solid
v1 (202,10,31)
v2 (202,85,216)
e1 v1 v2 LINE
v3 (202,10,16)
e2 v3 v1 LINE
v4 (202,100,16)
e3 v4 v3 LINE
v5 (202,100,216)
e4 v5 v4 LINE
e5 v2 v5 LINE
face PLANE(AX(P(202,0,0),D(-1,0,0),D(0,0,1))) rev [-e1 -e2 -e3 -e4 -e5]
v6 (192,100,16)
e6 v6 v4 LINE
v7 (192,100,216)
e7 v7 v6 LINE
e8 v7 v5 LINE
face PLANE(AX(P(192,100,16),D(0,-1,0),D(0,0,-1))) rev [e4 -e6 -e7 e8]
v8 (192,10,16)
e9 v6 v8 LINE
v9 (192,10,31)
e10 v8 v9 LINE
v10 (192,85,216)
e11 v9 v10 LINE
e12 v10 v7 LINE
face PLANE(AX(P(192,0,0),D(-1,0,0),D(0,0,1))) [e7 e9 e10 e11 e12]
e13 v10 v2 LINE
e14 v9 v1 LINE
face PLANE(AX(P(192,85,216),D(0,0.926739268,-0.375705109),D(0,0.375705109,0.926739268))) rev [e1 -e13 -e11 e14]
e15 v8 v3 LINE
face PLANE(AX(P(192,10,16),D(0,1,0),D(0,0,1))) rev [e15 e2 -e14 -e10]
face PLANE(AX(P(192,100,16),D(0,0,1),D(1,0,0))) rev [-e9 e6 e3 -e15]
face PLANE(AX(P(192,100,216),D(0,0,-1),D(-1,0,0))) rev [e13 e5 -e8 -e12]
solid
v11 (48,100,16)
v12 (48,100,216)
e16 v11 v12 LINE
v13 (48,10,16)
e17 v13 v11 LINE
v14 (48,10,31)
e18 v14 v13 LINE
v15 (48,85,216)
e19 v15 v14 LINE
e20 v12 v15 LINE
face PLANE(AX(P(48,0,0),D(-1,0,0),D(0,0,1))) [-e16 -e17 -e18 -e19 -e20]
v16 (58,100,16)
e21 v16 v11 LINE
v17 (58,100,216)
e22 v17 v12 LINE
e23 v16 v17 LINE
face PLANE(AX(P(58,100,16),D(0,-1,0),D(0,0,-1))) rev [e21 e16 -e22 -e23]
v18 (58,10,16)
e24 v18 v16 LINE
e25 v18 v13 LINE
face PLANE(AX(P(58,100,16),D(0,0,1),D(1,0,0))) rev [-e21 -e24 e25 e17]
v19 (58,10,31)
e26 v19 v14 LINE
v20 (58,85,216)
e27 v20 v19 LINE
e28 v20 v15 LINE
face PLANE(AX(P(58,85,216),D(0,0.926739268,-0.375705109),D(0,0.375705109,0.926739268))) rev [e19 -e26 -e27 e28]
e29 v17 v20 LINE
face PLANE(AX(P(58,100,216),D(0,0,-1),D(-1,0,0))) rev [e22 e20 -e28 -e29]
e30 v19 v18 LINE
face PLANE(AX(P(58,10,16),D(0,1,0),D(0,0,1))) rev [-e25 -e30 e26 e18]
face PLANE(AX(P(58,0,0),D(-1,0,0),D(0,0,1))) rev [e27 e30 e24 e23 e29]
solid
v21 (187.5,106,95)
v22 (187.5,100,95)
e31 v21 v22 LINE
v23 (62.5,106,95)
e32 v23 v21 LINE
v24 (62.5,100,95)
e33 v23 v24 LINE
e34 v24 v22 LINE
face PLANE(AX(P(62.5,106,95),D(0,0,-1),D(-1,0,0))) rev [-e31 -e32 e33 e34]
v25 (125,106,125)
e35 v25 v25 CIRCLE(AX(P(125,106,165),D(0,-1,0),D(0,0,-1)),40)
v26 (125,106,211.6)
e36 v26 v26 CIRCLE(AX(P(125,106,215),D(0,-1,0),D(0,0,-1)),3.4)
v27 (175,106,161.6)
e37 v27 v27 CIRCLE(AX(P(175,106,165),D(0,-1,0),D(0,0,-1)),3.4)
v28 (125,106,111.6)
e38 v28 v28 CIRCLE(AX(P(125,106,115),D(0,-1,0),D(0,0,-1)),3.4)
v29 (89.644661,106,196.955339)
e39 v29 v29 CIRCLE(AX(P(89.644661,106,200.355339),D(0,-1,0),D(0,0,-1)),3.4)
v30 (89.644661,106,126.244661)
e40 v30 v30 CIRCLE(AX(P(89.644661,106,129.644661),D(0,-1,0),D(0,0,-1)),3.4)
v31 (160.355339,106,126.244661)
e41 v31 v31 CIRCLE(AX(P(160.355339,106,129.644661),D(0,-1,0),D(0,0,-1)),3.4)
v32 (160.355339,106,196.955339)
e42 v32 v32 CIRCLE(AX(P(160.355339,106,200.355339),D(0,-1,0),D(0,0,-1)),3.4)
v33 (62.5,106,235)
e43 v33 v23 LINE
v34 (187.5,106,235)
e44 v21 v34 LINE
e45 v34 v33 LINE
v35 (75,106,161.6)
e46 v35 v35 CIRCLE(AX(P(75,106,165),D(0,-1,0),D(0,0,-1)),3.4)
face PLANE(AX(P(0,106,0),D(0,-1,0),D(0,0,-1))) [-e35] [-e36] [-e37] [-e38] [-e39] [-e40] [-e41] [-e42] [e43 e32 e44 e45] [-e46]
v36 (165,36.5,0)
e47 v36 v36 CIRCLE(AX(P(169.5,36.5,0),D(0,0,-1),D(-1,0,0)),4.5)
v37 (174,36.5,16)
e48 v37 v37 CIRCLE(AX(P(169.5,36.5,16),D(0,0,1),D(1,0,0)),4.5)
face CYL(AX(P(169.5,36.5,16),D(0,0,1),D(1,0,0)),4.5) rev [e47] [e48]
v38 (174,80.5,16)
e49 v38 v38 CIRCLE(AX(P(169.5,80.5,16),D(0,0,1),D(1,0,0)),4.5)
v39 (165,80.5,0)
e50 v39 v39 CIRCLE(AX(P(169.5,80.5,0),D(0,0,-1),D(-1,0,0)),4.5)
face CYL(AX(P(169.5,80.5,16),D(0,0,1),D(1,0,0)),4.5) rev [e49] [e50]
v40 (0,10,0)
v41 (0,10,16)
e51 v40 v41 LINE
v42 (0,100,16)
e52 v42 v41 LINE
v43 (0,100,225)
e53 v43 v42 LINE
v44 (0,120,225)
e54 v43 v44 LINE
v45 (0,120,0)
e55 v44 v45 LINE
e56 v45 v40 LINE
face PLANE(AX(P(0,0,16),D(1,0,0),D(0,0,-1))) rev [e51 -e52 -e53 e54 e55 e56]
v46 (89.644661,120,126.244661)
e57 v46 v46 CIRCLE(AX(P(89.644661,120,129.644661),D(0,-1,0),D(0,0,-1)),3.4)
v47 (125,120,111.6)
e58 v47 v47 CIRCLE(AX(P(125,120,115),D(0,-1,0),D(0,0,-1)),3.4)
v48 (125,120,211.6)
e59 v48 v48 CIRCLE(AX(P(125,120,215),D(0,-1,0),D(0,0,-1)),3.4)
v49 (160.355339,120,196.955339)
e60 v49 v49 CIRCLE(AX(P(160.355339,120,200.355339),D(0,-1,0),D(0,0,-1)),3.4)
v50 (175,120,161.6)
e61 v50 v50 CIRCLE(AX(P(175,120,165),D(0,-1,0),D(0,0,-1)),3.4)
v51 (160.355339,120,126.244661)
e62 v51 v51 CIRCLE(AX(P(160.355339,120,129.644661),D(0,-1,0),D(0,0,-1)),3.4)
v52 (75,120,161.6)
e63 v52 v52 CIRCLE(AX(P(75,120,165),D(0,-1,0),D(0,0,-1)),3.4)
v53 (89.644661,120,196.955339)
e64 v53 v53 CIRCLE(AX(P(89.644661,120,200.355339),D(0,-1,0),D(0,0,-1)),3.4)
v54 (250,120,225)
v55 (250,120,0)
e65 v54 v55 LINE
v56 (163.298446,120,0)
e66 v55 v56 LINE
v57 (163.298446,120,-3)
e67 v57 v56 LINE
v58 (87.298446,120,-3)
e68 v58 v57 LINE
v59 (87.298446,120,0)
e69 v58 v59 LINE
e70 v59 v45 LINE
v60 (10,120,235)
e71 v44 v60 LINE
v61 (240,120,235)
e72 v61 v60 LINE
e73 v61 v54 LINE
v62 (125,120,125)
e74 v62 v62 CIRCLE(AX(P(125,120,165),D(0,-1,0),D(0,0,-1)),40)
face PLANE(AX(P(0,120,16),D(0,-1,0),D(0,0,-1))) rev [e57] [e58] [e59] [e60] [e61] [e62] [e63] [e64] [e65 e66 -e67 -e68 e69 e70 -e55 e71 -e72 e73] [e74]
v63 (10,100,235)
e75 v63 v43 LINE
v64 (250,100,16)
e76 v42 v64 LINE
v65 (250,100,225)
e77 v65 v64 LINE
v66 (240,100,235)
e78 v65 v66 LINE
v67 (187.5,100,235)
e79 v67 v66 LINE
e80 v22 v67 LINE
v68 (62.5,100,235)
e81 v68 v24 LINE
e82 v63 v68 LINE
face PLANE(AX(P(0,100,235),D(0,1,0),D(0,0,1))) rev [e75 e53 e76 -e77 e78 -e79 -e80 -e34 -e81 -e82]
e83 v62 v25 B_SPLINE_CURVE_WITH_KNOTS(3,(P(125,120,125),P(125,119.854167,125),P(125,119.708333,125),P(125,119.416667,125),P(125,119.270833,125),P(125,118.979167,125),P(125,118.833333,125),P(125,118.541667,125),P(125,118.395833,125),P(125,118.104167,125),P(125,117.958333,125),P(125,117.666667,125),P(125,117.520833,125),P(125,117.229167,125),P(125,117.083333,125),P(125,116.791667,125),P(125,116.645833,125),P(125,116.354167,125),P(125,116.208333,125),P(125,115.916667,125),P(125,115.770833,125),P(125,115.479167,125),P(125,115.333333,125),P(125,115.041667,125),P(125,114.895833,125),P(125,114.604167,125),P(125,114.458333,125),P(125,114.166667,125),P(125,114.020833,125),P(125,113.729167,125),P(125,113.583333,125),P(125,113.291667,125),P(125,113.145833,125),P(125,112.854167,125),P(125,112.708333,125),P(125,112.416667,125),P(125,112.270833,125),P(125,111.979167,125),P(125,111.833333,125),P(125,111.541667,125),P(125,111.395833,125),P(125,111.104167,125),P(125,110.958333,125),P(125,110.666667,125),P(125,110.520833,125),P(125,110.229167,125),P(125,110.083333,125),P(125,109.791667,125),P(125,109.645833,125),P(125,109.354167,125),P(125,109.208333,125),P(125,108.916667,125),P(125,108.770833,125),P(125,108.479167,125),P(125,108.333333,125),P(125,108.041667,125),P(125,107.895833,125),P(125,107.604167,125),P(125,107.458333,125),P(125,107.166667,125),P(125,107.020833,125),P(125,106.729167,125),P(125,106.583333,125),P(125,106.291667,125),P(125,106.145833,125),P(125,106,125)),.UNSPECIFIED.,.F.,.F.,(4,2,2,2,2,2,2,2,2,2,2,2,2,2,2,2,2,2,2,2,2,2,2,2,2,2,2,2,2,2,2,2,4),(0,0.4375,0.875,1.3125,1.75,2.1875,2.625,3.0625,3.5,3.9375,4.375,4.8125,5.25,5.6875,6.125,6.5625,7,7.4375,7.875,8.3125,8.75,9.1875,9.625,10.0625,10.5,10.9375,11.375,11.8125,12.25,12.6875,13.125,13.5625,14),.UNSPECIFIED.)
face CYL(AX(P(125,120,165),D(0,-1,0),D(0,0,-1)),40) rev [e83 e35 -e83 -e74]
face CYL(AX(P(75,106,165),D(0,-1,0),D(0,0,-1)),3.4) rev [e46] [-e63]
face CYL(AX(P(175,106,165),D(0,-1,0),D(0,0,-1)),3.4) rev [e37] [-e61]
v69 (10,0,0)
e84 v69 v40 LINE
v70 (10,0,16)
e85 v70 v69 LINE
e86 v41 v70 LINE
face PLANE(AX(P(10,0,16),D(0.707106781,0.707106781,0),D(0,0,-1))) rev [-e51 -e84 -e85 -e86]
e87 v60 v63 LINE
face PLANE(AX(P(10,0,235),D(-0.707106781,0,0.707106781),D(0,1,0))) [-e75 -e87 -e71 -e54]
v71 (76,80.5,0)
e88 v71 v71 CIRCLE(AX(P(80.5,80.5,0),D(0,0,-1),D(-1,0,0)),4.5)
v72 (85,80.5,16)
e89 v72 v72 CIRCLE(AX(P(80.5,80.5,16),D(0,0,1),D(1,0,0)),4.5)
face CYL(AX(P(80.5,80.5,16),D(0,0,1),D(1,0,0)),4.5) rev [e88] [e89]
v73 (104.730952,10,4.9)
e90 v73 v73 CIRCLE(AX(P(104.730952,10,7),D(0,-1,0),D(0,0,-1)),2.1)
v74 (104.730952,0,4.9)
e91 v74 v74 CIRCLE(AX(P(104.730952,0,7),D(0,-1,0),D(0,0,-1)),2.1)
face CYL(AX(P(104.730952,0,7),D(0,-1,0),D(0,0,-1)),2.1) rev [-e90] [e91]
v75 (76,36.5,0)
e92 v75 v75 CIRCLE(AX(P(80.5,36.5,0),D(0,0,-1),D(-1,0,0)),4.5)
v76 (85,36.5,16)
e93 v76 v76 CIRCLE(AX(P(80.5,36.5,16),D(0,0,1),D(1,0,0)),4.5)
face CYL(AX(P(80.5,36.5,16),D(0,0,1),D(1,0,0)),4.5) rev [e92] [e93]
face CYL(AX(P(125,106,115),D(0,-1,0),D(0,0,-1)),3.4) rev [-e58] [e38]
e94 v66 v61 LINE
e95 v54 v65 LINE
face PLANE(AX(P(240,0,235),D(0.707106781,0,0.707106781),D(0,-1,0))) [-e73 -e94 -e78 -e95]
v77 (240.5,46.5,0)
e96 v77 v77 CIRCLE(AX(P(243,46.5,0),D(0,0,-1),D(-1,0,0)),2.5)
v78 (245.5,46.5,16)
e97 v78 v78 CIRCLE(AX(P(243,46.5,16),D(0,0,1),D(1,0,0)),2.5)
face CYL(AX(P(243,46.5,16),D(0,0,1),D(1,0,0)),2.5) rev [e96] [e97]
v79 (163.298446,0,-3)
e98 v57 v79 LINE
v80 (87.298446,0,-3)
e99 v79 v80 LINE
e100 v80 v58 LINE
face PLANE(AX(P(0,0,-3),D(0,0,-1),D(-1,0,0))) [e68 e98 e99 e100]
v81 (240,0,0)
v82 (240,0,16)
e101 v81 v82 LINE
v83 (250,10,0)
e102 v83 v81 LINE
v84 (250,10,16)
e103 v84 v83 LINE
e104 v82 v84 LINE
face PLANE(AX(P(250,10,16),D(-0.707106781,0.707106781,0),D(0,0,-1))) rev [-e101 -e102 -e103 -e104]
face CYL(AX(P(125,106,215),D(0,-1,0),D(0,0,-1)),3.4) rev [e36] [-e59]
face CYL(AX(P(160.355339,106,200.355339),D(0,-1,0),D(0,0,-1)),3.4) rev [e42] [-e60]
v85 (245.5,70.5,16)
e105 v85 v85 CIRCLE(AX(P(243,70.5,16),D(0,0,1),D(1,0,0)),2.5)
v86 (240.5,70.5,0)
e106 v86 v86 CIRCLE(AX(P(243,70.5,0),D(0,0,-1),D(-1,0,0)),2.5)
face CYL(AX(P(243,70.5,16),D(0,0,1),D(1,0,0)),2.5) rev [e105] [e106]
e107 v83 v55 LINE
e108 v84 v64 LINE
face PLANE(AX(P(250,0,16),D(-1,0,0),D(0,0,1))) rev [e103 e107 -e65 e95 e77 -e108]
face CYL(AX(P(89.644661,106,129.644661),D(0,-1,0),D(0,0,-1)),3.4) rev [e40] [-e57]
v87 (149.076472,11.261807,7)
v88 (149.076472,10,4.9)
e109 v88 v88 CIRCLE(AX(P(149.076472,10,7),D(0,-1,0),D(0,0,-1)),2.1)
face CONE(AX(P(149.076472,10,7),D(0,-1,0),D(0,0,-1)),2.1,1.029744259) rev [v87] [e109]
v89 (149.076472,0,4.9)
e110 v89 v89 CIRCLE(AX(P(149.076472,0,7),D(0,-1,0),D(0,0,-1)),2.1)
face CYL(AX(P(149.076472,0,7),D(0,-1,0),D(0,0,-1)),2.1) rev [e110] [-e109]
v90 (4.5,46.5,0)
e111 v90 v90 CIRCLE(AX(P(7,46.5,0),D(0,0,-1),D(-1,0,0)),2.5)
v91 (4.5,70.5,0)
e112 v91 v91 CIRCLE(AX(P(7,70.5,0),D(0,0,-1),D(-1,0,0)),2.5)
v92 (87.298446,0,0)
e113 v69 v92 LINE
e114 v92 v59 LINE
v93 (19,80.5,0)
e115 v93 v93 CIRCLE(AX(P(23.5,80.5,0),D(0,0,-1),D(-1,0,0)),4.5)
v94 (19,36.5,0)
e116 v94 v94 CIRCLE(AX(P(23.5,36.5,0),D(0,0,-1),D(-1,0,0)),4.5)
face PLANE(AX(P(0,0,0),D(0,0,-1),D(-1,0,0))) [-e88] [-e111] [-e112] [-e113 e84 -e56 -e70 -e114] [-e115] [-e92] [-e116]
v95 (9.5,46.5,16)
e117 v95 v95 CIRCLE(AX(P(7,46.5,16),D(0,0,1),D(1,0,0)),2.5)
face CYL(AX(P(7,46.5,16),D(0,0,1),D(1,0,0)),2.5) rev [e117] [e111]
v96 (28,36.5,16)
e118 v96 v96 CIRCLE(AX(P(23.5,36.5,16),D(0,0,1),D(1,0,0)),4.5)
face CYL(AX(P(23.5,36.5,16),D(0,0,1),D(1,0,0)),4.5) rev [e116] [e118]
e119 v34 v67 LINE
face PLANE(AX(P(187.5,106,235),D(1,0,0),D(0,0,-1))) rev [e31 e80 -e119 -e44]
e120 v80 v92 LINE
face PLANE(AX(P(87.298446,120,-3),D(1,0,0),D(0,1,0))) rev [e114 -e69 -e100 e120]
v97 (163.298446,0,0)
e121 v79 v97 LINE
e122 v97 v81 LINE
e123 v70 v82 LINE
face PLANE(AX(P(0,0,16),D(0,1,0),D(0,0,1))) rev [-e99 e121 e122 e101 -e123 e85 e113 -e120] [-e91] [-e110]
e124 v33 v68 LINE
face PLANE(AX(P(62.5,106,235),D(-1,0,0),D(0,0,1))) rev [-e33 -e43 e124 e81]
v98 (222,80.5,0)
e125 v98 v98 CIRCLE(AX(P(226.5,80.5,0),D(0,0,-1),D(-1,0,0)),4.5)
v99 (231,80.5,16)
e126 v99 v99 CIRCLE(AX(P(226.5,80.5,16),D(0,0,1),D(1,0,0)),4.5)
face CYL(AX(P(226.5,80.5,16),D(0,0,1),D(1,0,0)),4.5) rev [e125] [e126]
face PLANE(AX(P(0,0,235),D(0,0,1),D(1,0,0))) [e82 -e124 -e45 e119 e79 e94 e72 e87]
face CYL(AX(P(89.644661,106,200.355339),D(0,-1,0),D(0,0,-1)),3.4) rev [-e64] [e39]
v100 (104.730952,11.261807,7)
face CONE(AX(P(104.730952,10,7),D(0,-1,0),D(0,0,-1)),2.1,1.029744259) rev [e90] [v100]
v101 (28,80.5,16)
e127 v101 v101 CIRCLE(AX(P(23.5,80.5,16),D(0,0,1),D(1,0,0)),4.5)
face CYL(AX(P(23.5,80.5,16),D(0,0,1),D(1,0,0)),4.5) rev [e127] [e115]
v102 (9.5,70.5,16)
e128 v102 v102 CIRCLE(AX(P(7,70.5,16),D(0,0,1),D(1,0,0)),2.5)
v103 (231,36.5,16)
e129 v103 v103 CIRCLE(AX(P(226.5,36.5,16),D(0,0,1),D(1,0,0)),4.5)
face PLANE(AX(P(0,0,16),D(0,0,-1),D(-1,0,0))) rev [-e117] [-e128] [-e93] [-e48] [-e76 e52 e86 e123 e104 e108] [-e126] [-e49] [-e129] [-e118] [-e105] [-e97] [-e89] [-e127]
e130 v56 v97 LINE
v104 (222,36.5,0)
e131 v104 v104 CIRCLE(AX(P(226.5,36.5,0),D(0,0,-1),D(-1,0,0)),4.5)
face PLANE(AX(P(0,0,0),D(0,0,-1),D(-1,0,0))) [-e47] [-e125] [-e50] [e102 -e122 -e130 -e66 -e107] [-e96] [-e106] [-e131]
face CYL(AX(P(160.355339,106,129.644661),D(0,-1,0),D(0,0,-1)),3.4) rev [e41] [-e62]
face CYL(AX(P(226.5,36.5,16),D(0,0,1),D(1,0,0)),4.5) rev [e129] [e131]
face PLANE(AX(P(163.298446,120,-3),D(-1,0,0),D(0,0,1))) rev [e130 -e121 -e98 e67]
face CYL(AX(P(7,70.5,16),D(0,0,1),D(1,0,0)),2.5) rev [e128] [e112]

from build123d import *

# Parameters (mm, degrees)
SKETCH1_W                         = 250
SKETCH1_H                         = 120
BOSS_EXTRUDE1_DEPTH               = 16
SKETCH2_W                         = 250
SKETCH2_H                         = 20
BOSS_EXTRUDE2_DEPTH               = 235
GUSSET1_START                     = 192
GUSSET1_DEPTH                     = 10
GUSSET2_START                     = 48
GUSSET2_DEPTH                     = 10
SKETCH5_W                         = 76
SKETCH5_H                         = 120
BOSS_EXTRUDE3_DEPTH               = 3
SKETCH6_W                         = 125
SKETCH6_H                         = 140
CUT_EXTRUDE1_DEPTH                = 6
SKETCH7_R                         = 40
CUT_EXTRUDE2_DEPTH                = 360.111403328
SKETCH10_W                        = 3.4
SKETCH10_H                        = 14
M8_TAPPED_HOLE1_AT_2_COUNT        = 2
M8_TAPPED_HOLE1_AT_2_PITCH        = 70.710678119
M8_TAPPED_HOLE1_AT_3_COUNT        = 2
M8_TAPPED_HOLE1_AT_3_PITCH        = 100
M8_TAPPED_HOLE1_AT_4_COUNT        = 2
M8_TAPPED_HOLE1_AT_4_PITCH        = 70.710678119
M8_TAPPED_HOLE1_AT_5_COUNT        = 2
M8_TAPPED_HOLE1_AT_5_PITCH        = 92.387953251
M8_TAPPED_HOLE1_AT_6_COUNT        = 2
M8_TAPPED_HOLE1_AT_6_PITCH        = 38.268343237
M8_TAPPED_HOLE1_AT_7_COUNT        = 2
M8_TAPPED_HOLE1_AT_7_PITCH        = 92.387953251
M8_TAPPED_HOLE1_AT_8_COUNT        = 2
M8_TAPPED_HOLE1_AT_8_PITCH        = 38.268343237
M5_TAPPED_HOLE1_AT_2_COUNT        = 2
M5_TAPPED_HOLE1_AT_2_PITCH        = 44.345519866
SKETCH16_W                        = 4.5
SKETCH16_H                        = 19
F_9_0_9_DIAMETER_HOLE1_AT_2_COUNT = 2
F_9_0_9_DIAMETER_HOLE1_AT_2_PITCH = 44
F_9_0_9_DIAMETER_HOLE1_AT_3_COUNT = 2
F_9_0_9_DIAMETER_HOLE1_AT_3_PITCH = 57
F_9_0_9_DIAMETER_HOLE1_AT_4_COUNT = 2
F_9_0_9_DIAMETER_HOLE1_AT_4_PITCH = 72.00694411
F_9_0_9_DIAMETER_HOLE1_AT_5_COUNT = 2
F_9_0_9_DIAMETER_HOLE1_AT_5_PITCH = 146
F_9_0_9_DIAMETER_HOLE1_AT_6_COUNT = 2
F_9_0_9_DIAMETER_HOLE1_AT_6_PITCH = 152.486064937
F_9_0_9_DIAMETER_HOLE1_AT_7_COUNT = 2
F_9_0_9_DIAMETER_HOLE1_AT_7_PITCH = 203
F_9_0_9_DIAMETER_HOLE1_AT_8_COUNT = 2
F_9_0_9_DIAMETER_HOLE1_AT_8_PITCH = 207.713745332
SKETCH18_W                        = 2.5
SKETCH18_H                        = 19
TAP_DRILL_FOR_M6_TAP1_AT_2_COUNT  = 2
TAP_DRILL_FOR_M6_TAP1_AT_2_PITCH  = 24
TAP_DRILL_FOR_M6_TAP1_AT_3_COUNT  = 2
TAP_DRILL_FOR_M6_TAP1_AT_3_PITCH  = 236
TAP_DRILL_FOR_M6_TAP1_AT_4_COUNT  = 2
TAP_DRILL_FOR_M6_TAP1_AT_4_PITCH  = 237.217200051
CHAMFER1_SIZE                     = 10


# Read off the part's stored shape, not the designer's step: Gusset1, Gusset2
with BuildPart() as part:
    # Sketch1 → Boss-Extrude1 (new body)
    with BuildSketch(Plane.XY):
        with Locations((125, 60)):
            Rectangle(SKETCH1_W, SKETCH1_H)
    extrude(amount=BOSS_EXTRUDE1_DEPTH)

    # Sketch2 → Boss-Extrude2 (add)
    with BuildSketch(Plane.XY):
        with Locations((125, 110)):
            Rectangle(SKETCH2_W, SKETCH2_H)
    extrude(amount=BOSS_EXTRUDE2_DEPTH)

    # Sketch5 → Boss-Extrude3 (add)
    with BuildSketch(Plane(origin=(0, 0, 0), x_dir=(-1, 0, 0), z_dir=(0, 0, -1))):
        with Locations((-125.298445595, 60)):
            Rectangle(SKETCH5_W, SKETCH5_H)
    extrude(amount=BOSS_EXTRUDE3_DEPTH)

    # Sketch6 → Cut-Extrude1 (cut)
    with BuildSketch(Plane.XZ.offset(-100)):
        with Locations((125, 165)):
            Rectangle(SKETCH6_W, SKETCH6_H)
    extrude(amount=-CUT_EXTRUDE1_DEPTH, mode=Mode.SUBTRACT)

    # Sketch7 → Cut-Extrude2 (cut, through all)
    with BuildSketch(Plane.XZ.offset(-106)):
        with Locations(Location((125, 165, 0), (0, 0, 270))):
            Circle(SKETCH7_R)
    extrude(amount=-CUT_EXTRUDE2_DEPTH, mode=Mode.SUBTRACT)

    # Sketch10 → M8 Tapped Hole1 (revolve, cut)
    with BuildSketch(Plane(origin=(125, 106, 215), x_dir=(0, 0, -1), z_dir=(1, 0, 0))):
        with Locations((1.7, 7)):
            Rectangle(SKETCH10_W, SKETCH10_H)
    m8_tapped_hole1 = revolve(axis=Axis((125, 99.65, 215), (0, 1, 0)), mode=Mode.SUBTRACT)

    # M8 Tapped Hole1 at 2: M8 Tapped Hole1 ×2
    with Locations(*[Vector(-0.7071067811865476, 0, -0.7071067811865476) * (i * M8_TAPPED_HOLE1_AT_2_PITCH) for i in range(1, M8_TAPPED_HOLE1_AT_2_COUNT)]):
        add(m8_tapped_hole1, mode=Mode.SUBTRACT)

    # M8 Tapped Hole1 at 3: M8 Tapped Hole1 ×2
    with Locations(*[(0, 0, -i * M8_TAPPED_HOLE1_AT_3_PITCH) for i in range(1, M8_TAPPED_HOLE1_AT_3_COUNT)]):
        add(m8_tapped_hole1, mode=Mode.SUBTRACT)

    # M8 Tapped Hole1 at 4: M8 Tapped Hole1 ×2
    with Locations(*[Vector(0.7071067811865477, 0, -0.7071067811865475) * (i * M8_TAPPED_HOLE1_AT_4_PITCH) for i in range(1, M8_TAPPED_HOLE1_AT_4_COUNT)]):
        add(m8_tapped_hole1, mode=Mode.SUBTRACT)

    # M8 Tapped Hole1 at 5: M8 Tapped Hole1 ×2
    with Locations(*[Vector(-0.38268343236508917, 0, -0.9238795325112871) * (i * M8_TAPPED_HOLE1_AT_5_PITCH) for i in range(1, M8_TAPPED_HOLE1_AT_5_COUNT)]):
        add(m8_tapped_hole1, mode=Mode.SUBTRACT)

    # M8 Tapped Hole1 at 6: M8 Tapped Hole1 ×2
    with Locations(*[Vector(-0.9238795325112872, 0, -0.3826834323650889) * (i * M8_TAPPED_HOLE1_AT_6_PITCH) for i in range(1, M8_TAPPED_HOLE1_AT_6_COUNT)]):
        add(m8_tapped_hole1, mode=Mode.SUBTRACT)

    # M8 Tapped Hole1 at 7: M8 Tapped Hole1 ×2
    with Locations(*[Vector(0.3826834323650889, 0, -0.9238795325112871) * (i * M8_TAPPED_HOLE1_AT_7_PITCH) for i in range(1, M8_TAPPED_HOLE1_AT_7_COUNT)]):
        add(m8_tapped_hole1, mode=Mode.SUBTRACT)

    # M8 Tapped Hole1 at 8: M8 Tapped Hole1 ×2
    with Locations(*[Vector(0.9238795325112875, 0, -0.3826834323650881) * (i * M8_TAPPED_HOLE1_AT_8_PITCH) for i in range(1, M8_TAPPED_HOLE1_AT_8_COUNT)]):
        add(m8_tapped_hole1, mode=Mode.SUBTRACT)

    # Sketch12 → M5 Tapped Hole1 (revolve, cut)
    with BuildSketch(Plane(origin=(104.73095223, 0, 7), x_dir=(0, 0, -1), z_dir=(1, 0, 0))):
        Polygon((0, 0), (0, 11.2618073), (2.1, 10), (2.1, 0), align=None)
    m5_tapped_hole1 = revolve(axis=Axis((104.73095223, -6.35, 7), (0, 1, 0)), mode=Mode.SUBTRACT)

    # M5 Tapped Hole1 at 2: M5 Tapped Hole1 ×2
    with Locations(*[(i * M5_TAPPED_HOLE1_AT_2_PITCH, 0, 0) for i in range(1, M5_TAPPED_HOLE1_AT_2_COUNT)]):
        add(m5_tapped_hole1, mode=Mode.SUBTRACT)

    # Sketch16 → Ø9.0 (9) Diameter Hole1 (revolve, cut)
    with BuildSketch(Plane(origin=(23.5, 80.5, 16), x_dir=(0, -1, 0), z_dir=(1, 0, 0))):
        with Locations((2.25, 9.5)):
            Rectangle(SKETCH16_W, SKETCH16_H)
    f_9_0_9_diameter_hole1 = revolve(axis=Axis((23.5, 80.5, 22.35), (0, 0, -1)), mode=Mode.SUBTRACT)

    # Ø9.0 (9) Diameter Hole1 at 2: Ø9.0 (9) Diameter Hole1 ×2
    with Locations(*[(0, -i * F_9_0_9_DIAMETER_HOLE1_AT_2_PITCH, 0) for i in range(1, F_9_0_9_DIAMETER_HOLE1_AT_2_COUNT)]):
        add(f_9_0_9_diameter_hole1, mode=Mode.SUBTRACT)

    # Ø9.0 (9) Diameter Hole1 at 3: Ø9.0 (9) Diameter Hole1 ×2
    with Locations(*[(i * F_9_0_9_DIAMETER_HOLE1_AT_3_PITCH, 0, 0) for i in range(1, F_9_0_9_DIAMETER_HOLE1_AT_3_COUNT)]):
        add(f_9_0_9_diameter_hole1, mode=Mode.SUBTRACT)

    # Ø9.0 (9) Diameter Hole1 at 4: Ø9.0 (9) Diameter Hole1 ×2
    with Locations(*[Vector(0.79159032097319, -0.6110521775933395, 0) * (i * F_9_0_9_DIAMETER_HOLE1_AT_4_PITCH) for i in range(1, F_9_0_9_DIAMETER_HOLE1_AT_4_COUNT)]):
        add(f_9_0_9_diameter_hole1, mode=Mode.SUBTRACT)

    # Ø9.0 (9) Diameter Hole1 at 5: Ø9.0 (9) Diameter Hole1 ×2
    with Locations(*[(i * F_9_0_9_DIAMETER_HOLE1_AT_5_PITCH, 0, 0) for i in range(1, F_9_0_9_DIAMETER_HOLE1_AT_5_COUNT)]):
        add(f_9_0_9_diameter_hole1, mode=Mode.SUBTRACT)

    # Ø9.0 (9) Diameter Hole1 at 6: Ø9.0 (9) Diameter Hole1 ×2
    with Locations(*[Vector(0.9574645398596204, -0.2885509572179678, 0) * (i * F_9_0_9_DIAMETER_HOLE1_AT_6_PITCH) for i in range(1, F_9_0_9_DIAMETER_HOLE1_AT_6_COUNT)]):
        add(f_9_0_9_diameter_hole1, mode=Mode.SUBTRACT)

    # Ø9.0 (9) Diameter Hole1 at 7: Ø9.0 (9) Diameter Hole1 ×2
    with Locations(*[(i * F_9_0_9_DIAMETER_HOLE1_AT_7_PITCH, 0, 0) for i in range(1, F_9_0_9_DIAMETER_HOLE1_AT_7_COUNT)]):
        add(f_9_0_9_diameter_hole1, mode=Mode.SUBTRACT)

    # Ø9.0 (9) Diameter Hole1 at 8: Ø9.0 (9) Diameter Hole1 ×2
    with Locations(*[Vector(0.9773065315209362, -0.21182998712769055, 0) * (i * F_9_0_9_DIAMETER_HOLE1_AT_8_PITCH) for i in range(1, F_9_0_9_DIAMETER_HOLE1_AT_8_COUNT)]):
        add(f_9_0_9_diameter_hole1, mode=Mode.SUBTRACT)

    # Sketch18 → Tap Drill for M6 Tap1 (revolve, cut)
    with BuildSketch(Plane(origin=(7, 70.5, 16), x_dir=(0, -1, 0), z_dir=(1, 0, 0))):
        with Locations((1.25, 9.5)):
            Rectangle(SKETCH18_W, SKETCH18_H)
    tap_drill_for_m6_tap1 = revolve(axis=Axis((7, 70.5, 22.35), (0, 0, -1)), mode=Mode.SUBTRACT)

    # Tap Drill for M6 Tap1 at 2: Tap Drill for M6 Tap1 ×2
    with Locations(*[(0, -i * TAP_DRILL_FOR_M6_TAP1_AT_2_PITCH, 0) for i in range(1, TAP_DRILL_FOR_M6_TAP1_AT_2_COUNT)]):
        add(tap_drill_for_m6_tap1, mode=Mode.SUBTRACT)

    # Tap Drill for M6 Tap1 at 3: Tap Drill for M6 Tap1 ×2
    with Locations(*[(i * TAP_DRILL_FOR_M6_TAP1_AT_3_PITCH, 0, 0) for i in range(1, TAP_DRILL_FOR_M6_TAP1_AT_3_COUNT)]):
        add(tap_drill_for_m6_tap1, mode=Mode.SUBTRACT)

    # Tap Drill for M6 Tap1 at 4: Tap Drill for M6 Tap1 ×2
    with Locations(*[Vector(0.9948688372906245, -0.10117310209735164, 0) * (i * TAP_DRILL_FOR_M6_TAP1_AT_4_PITCH) for i in range(1, TAP_DRILL_FOR_M6_TAP1_AT_4_COUNT)]):
        add(tap_drill_for_m6_tap1, mode=Mode.SUBTRACT)

    # Chamfer1
    chamfer1_edges = [part.edges().sort_by_distance(p)[0] for p in [
        (0, 110, 235),
        (250, 110, 235),
        (250, 0, 8),
        (0, 0, 8),
    ]]
    chamfer(chamfer1_edges, length=CHAMFER1_SIZE)


with BuildPart() as body_2:
    # Gusset1 outline → Gusset1 (new body)
    with BuildSketch(Plane.YZ.offset(GUSSET1_START)):
        Polygon((100, 216), (85, 216), (10, 31), (10, 16), (100, 16), align=None)
    extrude(amount=GUSSET1_DEPTH)


with BuildPart() as body_3:
    # Gusset2 outline → Gusset2 (new body)
    with BuildSketch(Plane.YZ.offset(GUSSET2_START)):
        Polygon((100, 216), (85, 216), (10, 31), (10, 16), (100, 16), align=None)
    extrude(amount=GUSSET2_DEPTH)


solid = Compound([part.part, body_2.part, body_3.part])
